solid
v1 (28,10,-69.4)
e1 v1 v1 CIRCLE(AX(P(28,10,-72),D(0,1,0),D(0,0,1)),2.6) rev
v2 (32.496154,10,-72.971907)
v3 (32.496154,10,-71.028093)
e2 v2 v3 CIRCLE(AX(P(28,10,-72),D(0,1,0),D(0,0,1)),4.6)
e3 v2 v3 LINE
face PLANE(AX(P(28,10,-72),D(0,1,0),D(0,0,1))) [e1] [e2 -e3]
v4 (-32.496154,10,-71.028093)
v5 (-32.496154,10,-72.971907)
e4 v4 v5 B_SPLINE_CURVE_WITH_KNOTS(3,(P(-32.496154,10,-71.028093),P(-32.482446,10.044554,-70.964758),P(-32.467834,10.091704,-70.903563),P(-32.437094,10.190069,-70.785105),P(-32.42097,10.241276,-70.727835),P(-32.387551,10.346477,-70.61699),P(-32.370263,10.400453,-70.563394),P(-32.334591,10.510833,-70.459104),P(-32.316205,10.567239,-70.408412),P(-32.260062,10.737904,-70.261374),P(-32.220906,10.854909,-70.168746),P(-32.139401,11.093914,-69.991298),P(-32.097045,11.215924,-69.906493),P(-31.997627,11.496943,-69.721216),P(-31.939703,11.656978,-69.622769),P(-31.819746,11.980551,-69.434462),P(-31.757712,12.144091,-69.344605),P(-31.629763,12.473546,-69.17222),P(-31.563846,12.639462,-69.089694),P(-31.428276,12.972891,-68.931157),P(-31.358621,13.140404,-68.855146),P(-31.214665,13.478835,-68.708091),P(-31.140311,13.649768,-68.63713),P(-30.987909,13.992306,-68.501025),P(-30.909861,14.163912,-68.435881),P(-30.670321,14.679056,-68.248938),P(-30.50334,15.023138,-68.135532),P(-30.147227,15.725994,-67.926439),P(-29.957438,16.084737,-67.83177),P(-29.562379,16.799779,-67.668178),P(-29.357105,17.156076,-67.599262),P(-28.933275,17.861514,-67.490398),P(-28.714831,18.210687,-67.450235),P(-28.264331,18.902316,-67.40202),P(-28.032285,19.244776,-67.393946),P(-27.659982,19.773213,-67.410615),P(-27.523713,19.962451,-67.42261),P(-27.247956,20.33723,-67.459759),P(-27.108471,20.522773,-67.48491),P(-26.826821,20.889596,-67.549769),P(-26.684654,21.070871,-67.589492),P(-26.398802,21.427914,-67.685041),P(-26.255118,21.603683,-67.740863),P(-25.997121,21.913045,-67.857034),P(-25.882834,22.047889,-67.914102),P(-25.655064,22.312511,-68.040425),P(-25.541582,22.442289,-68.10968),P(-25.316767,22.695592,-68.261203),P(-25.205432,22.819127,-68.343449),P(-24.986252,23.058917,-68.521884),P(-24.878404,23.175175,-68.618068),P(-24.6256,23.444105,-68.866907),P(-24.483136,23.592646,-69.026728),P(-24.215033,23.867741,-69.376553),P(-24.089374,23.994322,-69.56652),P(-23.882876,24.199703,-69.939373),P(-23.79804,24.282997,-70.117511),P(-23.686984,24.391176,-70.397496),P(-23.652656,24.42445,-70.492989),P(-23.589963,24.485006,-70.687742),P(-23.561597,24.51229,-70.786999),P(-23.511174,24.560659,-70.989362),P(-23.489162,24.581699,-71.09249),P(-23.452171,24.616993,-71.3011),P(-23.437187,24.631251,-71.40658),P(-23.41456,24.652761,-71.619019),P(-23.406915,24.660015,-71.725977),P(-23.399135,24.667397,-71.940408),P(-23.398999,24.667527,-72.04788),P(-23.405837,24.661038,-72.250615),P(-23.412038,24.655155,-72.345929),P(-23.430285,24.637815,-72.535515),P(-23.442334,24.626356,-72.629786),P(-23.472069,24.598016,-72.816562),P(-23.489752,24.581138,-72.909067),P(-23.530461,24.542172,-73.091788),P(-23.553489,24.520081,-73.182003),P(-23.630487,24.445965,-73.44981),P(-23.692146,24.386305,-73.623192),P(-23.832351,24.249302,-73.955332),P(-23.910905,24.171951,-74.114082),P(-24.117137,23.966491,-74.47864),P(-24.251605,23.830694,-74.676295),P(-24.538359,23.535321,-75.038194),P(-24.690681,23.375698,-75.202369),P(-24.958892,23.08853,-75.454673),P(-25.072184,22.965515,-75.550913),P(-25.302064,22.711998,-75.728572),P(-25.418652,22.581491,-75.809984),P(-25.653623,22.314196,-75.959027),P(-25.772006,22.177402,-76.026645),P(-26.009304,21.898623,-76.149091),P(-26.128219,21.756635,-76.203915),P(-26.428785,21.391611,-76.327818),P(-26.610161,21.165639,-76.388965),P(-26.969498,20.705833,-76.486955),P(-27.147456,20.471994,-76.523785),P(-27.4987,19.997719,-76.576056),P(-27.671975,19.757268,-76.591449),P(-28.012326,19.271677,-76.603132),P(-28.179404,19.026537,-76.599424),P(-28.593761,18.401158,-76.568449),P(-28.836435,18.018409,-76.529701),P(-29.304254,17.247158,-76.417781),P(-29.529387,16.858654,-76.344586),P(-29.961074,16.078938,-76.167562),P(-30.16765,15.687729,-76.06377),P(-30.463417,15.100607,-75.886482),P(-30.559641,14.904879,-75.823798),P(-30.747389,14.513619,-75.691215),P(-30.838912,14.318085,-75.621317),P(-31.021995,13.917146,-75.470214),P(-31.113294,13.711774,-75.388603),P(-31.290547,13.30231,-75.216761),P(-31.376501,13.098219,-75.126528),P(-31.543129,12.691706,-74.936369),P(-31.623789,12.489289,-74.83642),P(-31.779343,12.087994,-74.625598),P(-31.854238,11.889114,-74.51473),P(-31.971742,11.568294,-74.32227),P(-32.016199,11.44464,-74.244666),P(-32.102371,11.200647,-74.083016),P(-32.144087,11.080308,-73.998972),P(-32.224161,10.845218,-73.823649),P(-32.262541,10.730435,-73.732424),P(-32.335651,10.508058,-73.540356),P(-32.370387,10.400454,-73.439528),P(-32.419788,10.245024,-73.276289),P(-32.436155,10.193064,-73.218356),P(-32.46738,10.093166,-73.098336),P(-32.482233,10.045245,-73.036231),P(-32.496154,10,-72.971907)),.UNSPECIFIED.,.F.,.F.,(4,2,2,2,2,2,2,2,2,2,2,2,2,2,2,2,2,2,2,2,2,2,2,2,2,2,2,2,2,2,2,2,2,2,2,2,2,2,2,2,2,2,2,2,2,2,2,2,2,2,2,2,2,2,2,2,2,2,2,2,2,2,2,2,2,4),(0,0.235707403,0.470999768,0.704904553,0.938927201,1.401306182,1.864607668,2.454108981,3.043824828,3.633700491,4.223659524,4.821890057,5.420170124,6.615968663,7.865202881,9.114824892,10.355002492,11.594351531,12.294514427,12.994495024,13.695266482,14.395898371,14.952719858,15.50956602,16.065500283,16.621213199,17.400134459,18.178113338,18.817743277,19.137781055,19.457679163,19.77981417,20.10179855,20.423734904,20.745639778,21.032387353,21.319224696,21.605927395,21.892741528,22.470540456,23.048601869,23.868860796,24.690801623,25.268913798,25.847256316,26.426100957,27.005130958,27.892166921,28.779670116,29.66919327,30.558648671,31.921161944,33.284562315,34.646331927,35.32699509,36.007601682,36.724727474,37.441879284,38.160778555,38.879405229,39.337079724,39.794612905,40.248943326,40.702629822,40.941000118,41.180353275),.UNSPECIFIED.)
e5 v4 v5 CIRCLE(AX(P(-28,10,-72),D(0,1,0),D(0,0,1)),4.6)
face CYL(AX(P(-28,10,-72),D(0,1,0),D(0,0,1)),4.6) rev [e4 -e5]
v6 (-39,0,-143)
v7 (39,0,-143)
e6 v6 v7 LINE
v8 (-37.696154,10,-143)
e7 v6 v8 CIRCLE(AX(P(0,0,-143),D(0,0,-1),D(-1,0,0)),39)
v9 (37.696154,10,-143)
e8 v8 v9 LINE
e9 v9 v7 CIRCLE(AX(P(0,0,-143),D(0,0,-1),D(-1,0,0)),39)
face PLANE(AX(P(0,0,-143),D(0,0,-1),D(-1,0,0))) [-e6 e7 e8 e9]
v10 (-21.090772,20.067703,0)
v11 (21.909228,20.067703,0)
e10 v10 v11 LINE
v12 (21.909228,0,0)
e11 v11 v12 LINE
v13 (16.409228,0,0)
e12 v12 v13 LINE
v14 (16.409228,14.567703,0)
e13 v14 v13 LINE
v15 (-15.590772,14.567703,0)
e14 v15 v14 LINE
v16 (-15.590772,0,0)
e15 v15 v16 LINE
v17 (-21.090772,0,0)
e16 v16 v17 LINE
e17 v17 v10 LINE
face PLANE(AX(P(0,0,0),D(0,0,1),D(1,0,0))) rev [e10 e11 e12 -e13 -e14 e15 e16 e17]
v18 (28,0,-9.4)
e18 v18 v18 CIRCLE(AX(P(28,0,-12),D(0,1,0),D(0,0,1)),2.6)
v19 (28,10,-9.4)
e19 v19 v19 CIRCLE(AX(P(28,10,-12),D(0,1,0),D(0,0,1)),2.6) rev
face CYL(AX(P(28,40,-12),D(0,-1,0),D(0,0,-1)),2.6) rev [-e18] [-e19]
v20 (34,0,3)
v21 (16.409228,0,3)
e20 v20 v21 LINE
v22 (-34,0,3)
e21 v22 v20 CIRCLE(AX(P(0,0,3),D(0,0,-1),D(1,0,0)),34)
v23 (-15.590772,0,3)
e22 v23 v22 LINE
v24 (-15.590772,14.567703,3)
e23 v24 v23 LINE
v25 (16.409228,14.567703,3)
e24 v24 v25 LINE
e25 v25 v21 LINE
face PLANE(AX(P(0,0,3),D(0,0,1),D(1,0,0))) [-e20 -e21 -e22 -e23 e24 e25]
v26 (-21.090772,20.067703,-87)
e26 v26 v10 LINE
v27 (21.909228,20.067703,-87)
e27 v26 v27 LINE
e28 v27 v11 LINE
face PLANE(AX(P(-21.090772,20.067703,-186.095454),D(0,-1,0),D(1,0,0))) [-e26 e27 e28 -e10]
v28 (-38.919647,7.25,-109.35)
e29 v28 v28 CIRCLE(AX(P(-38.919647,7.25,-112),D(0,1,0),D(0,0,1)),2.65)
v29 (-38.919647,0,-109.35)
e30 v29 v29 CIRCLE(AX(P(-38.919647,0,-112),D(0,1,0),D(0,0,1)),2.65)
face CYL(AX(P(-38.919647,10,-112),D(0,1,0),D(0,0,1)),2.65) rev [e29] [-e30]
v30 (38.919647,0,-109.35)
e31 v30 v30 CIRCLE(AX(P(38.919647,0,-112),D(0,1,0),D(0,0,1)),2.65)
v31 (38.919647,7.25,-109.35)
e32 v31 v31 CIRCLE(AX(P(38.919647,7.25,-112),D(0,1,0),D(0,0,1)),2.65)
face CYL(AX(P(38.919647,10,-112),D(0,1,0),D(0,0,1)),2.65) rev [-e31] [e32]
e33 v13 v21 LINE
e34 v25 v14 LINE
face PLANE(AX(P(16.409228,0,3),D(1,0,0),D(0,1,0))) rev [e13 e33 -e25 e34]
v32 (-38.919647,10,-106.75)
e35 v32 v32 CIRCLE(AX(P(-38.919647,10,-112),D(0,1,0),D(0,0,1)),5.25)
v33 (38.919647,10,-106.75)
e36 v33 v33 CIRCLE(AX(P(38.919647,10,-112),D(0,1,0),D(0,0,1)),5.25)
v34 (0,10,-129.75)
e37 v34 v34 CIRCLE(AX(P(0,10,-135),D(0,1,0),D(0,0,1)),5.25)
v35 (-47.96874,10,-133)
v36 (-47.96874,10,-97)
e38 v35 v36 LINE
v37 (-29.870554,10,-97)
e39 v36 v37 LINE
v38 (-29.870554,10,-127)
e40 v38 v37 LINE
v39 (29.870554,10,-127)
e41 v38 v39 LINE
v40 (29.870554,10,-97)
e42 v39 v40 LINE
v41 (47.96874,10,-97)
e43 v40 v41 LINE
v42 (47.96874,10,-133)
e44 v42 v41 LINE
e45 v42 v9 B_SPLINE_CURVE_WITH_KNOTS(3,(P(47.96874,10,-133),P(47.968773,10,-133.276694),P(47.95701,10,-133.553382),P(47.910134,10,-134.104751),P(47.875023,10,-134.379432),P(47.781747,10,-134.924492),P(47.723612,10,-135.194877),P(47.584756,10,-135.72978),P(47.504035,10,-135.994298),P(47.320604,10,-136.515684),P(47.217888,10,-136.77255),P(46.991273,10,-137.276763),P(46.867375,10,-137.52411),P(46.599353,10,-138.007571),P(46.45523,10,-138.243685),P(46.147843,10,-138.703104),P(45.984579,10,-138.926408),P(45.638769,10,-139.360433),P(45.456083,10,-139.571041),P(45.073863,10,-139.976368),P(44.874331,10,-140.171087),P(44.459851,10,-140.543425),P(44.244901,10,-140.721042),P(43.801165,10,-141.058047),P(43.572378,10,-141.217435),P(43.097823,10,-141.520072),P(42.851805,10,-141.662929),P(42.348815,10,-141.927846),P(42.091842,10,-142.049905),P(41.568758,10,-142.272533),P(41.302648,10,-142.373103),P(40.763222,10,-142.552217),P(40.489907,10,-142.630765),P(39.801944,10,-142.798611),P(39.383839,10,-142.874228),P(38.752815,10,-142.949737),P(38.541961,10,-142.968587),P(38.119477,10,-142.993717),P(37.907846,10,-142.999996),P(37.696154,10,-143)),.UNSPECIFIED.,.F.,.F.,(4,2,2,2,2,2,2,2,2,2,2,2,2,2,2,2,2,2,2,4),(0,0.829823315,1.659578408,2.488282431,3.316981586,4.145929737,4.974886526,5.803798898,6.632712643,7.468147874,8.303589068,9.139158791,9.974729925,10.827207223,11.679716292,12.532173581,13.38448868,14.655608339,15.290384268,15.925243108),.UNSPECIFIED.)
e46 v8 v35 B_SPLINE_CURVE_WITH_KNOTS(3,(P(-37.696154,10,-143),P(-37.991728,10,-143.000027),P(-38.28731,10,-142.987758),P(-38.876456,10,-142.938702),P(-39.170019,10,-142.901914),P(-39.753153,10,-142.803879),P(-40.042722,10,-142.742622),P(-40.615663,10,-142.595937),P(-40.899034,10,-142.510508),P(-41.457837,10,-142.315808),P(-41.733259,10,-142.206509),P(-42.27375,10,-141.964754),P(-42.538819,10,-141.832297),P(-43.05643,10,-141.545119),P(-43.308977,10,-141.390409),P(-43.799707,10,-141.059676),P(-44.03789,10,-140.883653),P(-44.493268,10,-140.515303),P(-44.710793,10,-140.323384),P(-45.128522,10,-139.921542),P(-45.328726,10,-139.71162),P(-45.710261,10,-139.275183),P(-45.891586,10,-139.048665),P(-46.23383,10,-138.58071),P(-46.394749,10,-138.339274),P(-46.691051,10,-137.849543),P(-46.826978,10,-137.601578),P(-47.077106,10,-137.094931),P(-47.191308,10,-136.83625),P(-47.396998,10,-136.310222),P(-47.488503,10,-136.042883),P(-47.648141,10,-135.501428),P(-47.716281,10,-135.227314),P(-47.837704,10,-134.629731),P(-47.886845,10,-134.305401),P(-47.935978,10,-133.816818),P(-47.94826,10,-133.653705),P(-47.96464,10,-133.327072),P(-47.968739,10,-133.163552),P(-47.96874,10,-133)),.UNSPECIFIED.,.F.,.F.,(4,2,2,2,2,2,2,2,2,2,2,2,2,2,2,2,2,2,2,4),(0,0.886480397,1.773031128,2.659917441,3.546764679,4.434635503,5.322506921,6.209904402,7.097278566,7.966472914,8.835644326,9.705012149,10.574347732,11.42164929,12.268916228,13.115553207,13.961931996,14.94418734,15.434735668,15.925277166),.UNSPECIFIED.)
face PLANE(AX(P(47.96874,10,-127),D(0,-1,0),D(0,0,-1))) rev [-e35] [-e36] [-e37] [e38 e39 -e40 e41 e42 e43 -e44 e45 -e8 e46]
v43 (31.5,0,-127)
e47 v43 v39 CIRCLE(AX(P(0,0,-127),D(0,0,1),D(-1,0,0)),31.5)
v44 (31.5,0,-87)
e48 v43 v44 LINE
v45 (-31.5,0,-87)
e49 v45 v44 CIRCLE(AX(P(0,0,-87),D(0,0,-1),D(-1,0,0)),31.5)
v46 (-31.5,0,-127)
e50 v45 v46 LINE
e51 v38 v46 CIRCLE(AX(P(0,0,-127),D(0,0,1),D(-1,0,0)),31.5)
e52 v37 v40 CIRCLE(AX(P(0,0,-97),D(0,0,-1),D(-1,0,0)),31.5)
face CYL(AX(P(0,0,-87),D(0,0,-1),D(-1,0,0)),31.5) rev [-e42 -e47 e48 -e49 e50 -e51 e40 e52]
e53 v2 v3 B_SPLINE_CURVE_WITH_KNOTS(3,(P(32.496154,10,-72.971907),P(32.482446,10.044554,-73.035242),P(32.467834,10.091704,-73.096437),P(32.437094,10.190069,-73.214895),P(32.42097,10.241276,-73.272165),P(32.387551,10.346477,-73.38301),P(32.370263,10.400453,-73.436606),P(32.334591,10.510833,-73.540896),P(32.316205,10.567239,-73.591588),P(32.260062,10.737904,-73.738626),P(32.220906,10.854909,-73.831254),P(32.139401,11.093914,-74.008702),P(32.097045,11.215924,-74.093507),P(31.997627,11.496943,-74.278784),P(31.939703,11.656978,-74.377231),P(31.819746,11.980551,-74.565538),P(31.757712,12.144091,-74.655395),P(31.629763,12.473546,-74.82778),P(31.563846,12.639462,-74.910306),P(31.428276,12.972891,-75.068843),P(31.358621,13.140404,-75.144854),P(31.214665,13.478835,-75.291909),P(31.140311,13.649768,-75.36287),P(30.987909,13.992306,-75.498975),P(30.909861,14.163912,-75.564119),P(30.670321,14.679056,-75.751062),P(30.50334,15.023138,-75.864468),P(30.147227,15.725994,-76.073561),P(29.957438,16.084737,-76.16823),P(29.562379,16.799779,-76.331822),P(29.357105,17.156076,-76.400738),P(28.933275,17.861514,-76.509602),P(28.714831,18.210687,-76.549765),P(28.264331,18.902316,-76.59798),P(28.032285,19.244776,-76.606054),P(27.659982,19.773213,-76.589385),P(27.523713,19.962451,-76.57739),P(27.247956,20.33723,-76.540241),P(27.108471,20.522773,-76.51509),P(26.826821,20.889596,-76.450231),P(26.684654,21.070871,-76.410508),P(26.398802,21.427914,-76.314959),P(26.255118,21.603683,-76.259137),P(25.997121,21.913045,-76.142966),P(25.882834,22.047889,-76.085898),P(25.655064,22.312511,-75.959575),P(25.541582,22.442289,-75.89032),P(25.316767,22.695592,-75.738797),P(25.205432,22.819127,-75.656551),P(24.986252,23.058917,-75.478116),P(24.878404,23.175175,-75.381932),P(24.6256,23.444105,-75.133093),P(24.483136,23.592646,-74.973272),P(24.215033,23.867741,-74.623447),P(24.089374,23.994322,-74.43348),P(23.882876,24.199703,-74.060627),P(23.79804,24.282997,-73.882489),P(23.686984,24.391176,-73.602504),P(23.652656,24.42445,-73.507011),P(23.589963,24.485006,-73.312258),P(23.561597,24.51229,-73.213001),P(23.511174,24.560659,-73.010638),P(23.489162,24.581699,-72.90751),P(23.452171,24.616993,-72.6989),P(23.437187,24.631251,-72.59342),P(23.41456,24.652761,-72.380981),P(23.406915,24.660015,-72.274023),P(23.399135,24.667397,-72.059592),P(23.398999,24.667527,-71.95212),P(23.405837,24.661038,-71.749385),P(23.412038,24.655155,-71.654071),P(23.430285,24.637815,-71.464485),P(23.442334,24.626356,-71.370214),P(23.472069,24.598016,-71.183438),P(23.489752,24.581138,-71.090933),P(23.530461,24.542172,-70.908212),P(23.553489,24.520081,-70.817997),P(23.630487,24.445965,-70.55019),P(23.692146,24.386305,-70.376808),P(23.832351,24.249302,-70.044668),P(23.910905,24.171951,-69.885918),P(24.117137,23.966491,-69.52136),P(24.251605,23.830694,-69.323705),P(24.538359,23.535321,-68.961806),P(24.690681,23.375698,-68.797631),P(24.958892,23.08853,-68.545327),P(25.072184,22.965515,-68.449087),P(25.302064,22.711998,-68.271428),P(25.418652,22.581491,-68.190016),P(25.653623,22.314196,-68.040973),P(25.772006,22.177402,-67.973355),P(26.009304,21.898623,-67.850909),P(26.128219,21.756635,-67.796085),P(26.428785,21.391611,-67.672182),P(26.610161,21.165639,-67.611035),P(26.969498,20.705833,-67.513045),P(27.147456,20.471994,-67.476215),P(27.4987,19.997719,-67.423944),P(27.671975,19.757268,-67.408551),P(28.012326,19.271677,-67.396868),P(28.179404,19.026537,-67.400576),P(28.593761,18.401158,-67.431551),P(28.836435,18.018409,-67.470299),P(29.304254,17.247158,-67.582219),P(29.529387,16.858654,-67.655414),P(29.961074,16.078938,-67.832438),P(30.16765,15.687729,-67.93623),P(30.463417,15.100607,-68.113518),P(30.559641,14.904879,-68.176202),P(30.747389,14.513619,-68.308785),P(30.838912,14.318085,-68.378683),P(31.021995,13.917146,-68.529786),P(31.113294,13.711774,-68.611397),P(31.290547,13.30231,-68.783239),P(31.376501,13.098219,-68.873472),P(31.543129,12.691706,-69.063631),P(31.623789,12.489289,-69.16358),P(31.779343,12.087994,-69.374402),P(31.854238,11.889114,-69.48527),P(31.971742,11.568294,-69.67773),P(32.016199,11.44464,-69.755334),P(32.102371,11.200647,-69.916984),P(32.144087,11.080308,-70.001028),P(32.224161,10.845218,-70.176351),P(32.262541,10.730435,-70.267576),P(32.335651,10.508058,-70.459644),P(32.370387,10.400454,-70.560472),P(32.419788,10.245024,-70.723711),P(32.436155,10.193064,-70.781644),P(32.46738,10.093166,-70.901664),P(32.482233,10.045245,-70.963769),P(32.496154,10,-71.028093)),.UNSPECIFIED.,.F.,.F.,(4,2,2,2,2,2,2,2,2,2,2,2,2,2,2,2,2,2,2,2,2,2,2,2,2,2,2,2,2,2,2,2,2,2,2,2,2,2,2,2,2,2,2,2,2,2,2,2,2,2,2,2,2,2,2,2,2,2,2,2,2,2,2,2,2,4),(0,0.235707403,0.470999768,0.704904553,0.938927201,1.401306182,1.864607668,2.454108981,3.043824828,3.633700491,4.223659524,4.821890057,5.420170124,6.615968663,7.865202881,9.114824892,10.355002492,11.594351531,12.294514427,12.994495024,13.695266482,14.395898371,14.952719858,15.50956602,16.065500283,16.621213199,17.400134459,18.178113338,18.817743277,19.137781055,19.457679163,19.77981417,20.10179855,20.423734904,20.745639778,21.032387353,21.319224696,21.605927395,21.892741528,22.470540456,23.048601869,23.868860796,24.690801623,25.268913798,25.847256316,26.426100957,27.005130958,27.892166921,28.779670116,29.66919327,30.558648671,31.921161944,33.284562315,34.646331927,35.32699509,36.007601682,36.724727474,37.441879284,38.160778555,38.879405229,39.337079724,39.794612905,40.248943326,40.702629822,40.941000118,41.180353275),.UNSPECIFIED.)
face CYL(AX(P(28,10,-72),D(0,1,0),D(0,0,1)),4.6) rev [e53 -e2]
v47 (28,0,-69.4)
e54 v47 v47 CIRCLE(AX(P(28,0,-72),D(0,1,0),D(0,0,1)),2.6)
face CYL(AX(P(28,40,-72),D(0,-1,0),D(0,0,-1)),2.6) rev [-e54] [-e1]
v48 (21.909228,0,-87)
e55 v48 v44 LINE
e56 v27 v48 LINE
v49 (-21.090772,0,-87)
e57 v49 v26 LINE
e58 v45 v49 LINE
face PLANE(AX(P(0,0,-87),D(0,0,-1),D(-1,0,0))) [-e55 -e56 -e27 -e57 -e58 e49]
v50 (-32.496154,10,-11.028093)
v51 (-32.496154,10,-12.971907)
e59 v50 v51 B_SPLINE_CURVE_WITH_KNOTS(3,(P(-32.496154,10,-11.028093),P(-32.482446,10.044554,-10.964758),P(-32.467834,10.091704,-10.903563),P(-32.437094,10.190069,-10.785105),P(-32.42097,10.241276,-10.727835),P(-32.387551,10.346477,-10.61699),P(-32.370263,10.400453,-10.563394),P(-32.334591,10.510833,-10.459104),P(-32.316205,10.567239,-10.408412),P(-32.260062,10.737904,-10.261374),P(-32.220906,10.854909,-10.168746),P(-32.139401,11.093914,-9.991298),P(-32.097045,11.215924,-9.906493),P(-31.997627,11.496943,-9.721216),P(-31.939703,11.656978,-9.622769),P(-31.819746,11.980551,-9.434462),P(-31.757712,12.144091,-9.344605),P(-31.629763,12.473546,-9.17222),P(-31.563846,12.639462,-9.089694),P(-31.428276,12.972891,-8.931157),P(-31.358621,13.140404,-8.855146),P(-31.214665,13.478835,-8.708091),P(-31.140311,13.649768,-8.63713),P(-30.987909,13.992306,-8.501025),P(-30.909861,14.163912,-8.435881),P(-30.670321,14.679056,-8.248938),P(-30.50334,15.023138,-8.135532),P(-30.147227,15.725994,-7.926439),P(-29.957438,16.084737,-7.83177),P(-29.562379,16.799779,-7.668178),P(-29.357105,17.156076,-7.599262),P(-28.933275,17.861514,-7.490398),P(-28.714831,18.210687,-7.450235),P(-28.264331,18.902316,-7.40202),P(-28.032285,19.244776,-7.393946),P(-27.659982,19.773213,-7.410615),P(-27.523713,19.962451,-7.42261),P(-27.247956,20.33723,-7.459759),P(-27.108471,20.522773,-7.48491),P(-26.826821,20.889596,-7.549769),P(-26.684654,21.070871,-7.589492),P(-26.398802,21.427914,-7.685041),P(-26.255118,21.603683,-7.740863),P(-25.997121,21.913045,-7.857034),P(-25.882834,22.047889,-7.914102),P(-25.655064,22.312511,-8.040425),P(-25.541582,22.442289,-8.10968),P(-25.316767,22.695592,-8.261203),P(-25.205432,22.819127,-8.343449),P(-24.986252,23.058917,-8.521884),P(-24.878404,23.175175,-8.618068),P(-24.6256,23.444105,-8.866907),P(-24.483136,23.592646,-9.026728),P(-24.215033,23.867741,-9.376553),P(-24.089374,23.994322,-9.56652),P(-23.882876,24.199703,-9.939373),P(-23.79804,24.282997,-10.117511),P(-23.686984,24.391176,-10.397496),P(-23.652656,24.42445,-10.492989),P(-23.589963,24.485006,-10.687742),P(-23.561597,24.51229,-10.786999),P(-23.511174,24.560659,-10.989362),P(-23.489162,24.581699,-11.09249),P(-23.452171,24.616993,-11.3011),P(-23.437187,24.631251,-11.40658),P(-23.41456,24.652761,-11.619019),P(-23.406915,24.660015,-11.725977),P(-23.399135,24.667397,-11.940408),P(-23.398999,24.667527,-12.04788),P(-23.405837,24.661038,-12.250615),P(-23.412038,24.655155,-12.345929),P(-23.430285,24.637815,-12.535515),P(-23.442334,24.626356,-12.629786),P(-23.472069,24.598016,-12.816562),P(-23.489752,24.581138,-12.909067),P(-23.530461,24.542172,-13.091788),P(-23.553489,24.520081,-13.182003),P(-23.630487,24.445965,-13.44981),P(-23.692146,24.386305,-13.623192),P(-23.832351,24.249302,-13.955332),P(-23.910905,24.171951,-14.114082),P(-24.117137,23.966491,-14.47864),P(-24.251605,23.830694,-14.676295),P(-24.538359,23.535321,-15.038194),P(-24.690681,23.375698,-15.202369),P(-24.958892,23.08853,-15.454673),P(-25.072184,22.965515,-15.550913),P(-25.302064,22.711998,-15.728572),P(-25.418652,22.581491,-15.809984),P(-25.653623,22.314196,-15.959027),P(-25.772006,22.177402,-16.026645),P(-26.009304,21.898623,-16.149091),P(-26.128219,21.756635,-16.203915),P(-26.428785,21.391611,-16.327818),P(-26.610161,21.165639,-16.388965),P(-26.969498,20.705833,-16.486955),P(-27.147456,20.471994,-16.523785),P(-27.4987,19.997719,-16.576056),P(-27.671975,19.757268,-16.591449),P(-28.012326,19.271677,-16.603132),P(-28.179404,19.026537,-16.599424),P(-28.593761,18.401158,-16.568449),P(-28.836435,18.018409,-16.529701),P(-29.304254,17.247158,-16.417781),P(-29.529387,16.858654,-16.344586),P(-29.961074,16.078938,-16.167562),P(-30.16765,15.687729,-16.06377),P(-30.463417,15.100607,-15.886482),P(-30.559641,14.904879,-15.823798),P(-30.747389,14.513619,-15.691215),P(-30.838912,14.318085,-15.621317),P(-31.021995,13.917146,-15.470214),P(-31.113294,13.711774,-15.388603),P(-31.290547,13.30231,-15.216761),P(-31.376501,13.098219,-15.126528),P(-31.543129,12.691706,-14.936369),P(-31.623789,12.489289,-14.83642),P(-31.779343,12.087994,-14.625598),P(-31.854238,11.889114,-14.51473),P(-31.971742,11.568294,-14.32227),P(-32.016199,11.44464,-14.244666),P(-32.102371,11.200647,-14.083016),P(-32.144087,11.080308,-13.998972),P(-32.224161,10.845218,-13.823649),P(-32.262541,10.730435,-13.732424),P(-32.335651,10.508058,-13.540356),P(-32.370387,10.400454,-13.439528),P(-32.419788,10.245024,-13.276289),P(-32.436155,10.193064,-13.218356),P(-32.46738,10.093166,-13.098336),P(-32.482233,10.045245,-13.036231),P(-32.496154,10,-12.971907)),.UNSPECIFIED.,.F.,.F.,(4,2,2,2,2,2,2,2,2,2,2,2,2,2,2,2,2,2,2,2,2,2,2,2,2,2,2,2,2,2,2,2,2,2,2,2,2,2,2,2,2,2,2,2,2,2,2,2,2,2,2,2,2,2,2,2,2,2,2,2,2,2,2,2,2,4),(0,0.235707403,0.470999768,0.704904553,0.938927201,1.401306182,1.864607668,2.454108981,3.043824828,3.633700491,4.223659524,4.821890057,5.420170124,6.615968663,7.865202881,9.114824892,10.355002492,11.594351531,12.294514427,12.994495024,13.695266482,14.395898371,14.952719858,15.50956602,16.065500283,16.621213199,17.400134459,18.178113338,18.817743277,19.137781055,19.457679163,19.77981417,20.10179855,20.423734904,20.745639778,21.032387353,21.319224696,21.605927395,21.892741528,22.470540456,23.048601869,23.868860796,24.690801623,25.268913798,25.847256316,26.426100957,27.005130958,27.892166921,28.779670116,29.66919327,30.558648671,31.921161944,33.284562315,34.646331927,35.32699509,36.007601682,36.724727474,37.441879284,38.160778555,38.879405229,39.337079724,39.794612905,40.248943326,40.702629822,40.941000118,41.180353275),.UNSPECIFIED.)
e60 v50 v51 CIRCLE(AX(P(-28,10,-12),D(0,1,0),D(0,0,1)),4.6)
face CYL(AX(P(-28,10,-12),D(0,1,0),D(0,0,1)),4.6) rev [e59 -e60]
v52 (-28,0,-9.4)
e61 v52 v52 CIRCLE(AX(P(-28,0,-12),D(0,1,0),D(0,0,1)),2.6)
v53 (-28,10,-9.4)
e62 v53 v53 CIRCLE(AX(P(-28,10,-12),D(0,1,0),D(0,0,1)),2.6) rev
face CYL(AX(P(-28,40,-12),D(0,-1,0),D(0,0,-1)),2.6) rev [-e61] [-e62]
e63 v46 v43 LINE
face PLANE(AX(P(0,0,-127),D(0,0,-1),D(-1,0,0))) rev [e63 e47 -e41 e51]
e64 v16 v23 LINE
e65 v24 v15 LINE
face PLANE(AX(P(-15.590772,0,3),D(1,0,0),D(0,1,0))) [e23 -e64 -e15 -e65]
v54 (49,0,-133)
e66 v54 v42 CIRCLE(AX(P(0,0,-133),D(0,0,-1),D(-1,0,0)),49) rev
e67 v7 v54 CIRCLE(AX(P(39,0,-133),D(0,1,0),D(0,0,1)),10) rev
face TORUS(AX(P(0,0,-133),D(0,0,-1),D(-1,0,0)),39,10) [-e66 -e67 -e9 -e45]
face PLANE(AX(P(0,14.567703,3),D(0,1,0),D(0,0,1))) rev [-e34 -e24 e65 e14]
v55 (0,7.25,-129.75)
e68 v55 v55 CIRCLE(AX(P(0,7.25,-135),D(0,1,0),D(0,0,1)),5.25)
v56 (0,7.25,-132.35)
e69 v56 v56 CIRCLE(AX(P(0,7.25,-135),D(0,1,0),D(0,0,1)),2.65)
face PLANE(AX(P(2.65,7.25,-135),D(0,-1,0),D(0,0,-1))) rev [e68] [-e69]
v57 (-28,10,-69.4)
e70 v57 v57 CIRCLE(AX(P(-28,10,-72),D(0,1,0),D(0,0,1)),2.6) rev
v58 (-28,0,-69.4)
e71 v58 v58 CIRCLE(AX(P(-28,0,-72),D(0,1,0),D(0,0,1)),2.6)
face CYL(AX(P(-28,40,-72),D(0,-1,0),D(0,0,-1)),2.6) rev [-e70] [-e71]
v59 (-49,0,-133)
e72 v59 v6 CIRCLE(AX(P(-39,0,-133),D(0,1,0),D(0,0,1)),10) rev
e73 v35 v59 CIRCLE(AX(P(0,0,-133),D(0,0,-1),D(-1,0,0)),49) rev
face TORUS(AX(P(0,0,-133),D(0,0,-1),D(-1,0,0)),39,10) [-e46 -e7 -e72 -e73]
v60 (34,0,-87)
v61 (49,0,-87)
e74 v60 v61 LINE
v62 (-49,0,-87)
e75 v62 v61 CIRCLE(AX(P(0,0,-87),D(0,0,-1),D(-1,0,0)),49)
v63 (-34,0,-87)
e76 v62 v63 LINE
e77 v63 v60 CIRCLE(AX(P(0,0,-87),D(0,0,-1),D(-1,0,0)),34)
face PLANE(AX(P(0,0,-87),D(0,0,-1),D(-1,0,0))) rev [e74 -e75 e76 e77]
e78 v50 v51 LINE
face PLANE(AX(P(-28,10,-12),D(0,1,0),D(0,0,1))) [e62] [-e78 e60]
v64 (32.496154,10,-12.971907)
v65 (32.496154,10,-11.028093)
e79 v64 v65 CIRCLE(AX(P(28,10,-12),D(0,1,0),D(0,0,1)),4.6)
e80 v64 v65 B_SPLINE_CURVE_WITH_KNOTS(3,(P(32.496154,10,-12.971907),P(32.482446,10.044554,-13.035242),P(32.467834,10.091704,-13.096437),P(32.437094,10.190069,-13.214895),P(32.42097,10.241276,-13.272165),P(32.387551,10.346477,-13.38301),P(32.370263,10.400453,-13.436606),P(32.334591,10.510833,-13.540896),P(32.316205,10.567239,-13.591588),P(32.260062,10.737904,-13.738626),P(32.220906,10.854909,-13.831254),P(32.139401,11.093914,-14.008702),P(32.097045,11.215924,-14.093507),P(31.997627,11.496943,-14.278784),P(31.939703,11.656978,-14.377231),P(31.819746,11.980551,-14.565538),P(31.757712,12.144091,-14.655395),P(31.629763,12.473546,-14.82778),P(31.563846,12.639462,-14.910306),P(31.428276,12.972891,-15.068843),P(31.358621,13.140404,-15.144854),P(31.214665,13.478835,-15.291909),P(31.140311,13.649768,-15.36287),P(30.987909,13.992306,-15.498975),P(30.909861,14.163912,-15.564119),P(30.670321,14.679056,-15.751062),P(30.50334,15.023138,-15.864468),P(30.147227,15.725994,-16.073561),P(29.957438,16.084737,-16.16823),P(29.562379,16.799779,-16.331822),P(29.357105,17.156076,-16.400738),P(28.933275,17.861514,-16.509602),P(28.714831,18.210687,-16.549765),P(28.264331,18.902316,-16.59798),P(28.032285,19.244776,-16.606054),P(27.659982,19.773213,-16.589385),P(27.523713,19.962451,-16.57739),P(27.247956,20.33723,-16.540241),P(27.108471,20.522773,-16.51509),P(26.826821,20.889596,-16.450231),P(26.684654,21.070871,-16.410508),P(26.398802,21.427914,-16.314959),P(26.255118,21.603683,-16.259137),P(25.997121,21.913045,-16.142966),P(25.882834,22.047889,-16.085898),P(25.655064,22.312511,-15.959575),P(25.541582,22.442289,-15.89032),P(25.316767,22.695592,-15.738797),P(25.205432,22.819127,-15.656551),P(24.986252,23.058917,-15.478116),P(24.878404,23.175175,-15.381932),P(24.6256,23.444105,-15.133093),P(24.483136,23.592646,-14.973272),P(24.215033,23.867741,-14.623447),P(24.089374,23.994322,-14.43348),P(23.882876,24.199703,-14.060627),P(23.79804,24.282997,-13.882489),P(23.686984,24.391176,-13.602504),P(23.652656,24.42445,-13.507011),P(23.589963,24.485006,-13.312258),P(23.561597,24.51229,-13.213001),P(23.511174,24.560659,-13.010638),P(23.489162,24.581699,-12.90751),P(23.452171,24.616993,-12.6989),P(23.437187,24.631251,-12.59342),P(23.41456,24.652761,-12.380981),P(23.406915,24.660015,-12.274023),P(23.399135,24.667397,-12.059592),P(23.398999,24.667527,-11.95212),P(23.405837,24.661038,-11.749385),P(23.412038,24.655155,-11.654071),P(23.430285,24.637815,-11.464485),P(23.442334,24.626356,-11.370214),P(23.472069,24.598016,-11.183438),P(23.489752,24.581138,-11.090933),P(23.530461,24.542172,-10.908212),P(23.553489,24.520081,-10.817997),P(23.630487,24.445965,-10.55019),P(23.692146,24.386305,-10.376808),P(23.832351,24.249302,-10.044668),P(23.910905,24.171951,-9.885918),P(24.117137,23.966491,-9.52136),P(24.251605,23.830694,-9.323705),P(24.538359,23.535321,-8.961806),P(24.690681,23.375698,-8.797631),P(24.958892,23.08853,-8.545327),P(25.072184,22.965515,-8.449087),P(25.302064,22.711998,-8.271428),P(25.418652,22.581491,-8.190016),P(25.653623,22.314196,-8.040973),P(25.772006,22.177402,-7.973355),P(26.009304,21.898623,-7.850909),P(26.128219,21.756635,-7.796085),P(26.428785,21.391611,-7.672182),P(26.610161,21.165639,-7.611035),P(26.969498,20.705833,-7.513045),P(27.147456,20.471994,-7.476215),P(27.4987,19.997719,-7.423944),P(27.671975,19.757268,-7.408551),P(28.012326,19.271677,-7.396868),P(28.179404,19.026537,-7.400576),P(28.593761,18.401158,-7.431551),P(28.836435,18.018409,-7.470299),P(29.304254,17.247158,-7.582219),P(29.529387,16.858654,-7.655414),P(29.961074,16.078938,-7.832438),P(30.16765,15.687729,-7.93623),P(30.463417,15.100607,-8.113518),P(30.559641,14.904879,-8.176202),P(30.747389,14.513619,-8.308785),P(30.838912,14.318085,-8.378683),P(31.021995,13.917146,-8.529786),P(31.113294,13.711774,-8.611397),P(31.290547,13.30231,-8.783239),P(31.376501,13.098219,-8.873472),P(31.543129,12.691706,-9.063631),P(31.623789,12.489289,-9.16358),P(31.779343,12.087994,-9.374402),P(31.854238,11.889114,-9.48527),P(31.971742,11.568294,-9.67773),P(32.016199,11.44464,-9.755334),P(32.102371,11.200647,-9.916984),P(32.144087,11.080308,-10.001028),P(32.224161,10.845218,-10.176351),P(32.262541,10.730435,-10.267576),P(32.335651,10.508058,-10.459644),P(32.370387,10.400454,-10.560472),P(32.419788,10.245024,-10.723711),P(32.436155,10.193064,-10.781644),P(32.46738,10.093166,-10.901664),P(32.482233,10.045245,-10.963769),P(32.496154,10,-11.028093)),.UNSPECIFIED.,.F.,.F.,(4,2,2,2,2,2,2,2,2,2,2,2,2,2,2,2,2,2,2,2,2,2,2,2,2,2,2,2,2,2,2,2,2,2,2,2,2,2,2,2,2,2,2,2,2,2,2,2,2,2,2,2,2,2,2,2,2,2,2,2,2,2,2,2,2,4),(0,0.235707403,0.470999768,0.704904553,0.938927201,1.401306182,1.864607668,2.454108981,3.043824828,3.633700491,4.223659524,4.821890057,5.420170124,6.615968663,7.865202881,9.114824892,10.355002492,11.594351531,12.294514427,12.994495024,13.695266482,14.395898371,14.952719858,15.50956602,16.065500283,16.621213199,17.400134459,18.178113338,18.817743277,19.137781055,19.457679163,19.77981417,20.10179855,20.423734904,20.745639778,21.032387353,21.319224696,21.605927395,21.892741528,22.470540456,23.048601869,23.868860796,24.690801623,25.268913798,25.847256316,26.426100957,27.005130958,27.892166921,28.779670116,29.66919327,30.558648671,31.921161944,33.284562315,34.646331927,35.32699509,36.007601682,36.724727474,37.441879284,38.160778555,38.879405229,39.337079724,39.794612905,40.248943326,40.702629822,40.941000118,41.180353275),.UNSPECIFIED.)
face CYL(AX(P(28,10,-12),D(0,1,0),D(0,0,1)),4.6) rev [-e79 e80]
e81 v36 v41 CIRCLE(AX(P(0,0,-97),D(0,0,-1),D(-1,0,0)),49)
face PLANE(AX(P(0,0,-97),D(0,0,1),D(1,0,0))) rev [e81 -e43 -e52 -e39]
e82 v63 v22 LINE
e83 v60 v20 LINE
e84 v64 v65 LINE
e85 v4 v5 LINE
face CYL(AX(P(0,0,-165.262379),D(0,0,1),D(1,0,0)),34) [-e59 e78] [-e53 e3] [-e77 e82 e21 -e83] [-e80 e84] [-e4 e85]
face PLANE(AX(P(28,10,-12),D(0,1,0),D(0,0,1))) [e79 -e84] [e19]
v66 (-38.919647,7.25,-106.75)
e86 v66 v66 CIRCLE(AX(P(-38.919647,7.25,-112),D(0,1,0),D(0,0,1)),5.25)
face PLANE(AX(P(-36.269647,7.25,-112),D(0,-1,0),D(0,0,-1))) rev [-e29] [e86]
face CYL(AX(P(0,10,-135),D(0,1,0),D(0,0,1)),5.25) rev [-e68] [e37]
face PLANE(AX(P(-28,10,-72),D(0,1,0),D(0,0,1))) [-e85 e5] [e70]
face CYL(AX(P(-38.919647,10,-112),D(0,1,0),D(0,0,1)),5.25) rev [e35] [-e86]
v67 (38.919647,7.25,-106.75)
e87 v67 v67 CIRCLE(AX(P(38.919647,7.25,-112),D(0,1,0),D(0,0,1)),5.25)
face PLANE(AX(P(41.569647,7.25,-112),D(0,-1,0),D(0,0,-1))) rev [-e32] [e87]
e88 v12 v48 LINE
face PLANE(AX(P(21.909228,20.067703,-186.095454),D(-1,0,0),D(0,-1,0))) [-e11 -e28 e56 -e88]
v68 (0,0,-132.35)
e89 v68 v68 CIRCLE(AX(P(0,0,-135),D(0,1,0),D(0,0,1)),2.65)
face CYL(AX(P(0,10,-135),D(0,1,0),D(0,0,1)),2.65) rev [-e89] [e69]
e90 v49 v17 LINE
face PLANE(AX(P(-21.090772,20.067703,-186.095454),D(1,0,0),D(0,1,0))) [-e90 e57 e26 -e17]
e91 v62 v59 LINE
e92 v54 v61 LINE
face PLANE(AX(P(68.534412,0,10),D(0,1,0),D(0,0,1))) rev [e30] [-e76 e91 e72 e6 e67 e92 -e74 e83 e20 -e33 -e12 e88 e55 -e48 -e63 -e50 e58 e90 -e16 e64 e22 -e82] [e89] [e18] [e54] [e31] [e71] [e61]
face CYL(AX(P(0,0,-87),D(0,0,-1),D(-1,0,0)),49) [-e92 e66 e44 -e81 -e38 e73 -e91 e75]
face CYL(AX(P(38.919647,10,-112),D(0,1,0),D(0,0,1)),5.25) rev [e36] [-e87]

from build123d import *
from build123d.topology import SkipClean

# Parameters (mm, degrees)
ESQUISSE2_R                                      = 31.5
ESQUISSE2_W                                      = 32
ESQUISSE2_H                                      = 32
BOSS_EXTRU_1_DEPTH                               = 3
BOSS_EXTRU_2_START                               = -100
ESQUISSE4_R                                      = 35
ESQUISSE4_R_2                                    = 31.5
BOSS_EXTRU_2_DEPTH                               = 100
BOSS_EXTRU_3_OUTLINE_R                           = 31.5
BOSS_EXTRU_3_OUTLINE_W                           = 43
BOSS_EXTRU_3_OUTLINE_H                           = 42.5
BOSS_EXTRU_3_DEPTH                               = 97
ESQUISSE6_R                                      = 31.5
ENL_V_MAT_EXTRU_1_DEPTH                          = 10
ESQUISSE7_R                                      = 49
ESQUISSE7_R_2                                    = 35
BOSS_EXTRU_4_DEPTH                               = 10
BOSS_EXTRU_5_START                               = 30
BOSS_EXTRU_5_DEPTH                               = 30
BOSS_EXTRU_6_START                               = 16
BOSS_EXTRU_6_DEPTH                               = 16
CONG_1_R                                         = 10
ESQUISSE11_W                                     = 137.068824
ESQUISSE11_H                                     = 50.889867
ENL_V_MAT_EXTRU_2_DEPTH                          = 153
CHAMBRAGE_POUR_VIS_T_TE_RONDE_6_PANS_D           = 5.3
CHAMBRAGE_POUR_VIS_T_TE_RONDE_6_PANS_DEPTH       = 18
CHAMBRAGE_POUR_VIS_T_TE_RONDE_6_PANS_CBORE_D     = 10.5
CHAMBRAGE_POUR_VIS_T_TE_RONDE_6_PANS_CBORE_DEPTH = 2.75
CHAMBRAGE_POUR_VIS_T_TE_RONDE_6_PANS_TIP         = 1.592281
ESQUISSE18_R                                     = 2.6
ENL_V_MAT_EXTRU_4_DEPTH                          = 25
ESQUISSE19_R                                     = 4.6
ENL_V_MAT_EXTRU_5_DEPTH                          = 25
ENL_V_START                                      = -90
ENL_V_MAT_EXTRU_6_DEPTH                          = 90


# Read off the part's stored shape, not the designer's step: Boss.-Extru.3
with BuildPart() as part:
    # Esquisse2 → Boss.-Extru.1 (new body)
    with BuildSketch(Plane.XY):
        Circle(ESQUISSE2_R)
        with Locations((0.409228, -1.432297)):
            Rectangle(ESQUISSE2_W, ESQUISSE2_H, mode=Mode.SUBTRACT)
    extrude(amount=BOSS_EXTRU_1_DEPTH)

    # Esquisse4 → Boss.-Extru.2 (add)
    with BuildSketch(Plane.XY.offset(3).offset(BOSS_EXTRU_2_START)):
        Circle(ESQUISSE4_R)
        Circle(ESQUISSE4_R_2, mode=Mode.SUBTRACT)
    extrude(amount=BOSS_EXTRU_2_DEPTH)

    # Boss.-Extru.3 outline → Boss.-Extru.3 (add)
    with BuildSketch(Plane(origin=(0, 0, 0), x_dir=(-1, 0, 0), z_dir=(0, 0, -1))):
        Circle(BOSS_EXTRU_3_OUTLINE_R)
        with Locations((-0.409228, -1.182297)):
            Rectangle(BOSS_EXTRU_3_OUTLINE_W, BOSS_EXTRU_3_OUTLINE_H, mode=Mode.SUBTRACT)
    extrude(amount=BOSS_EXTRU_3_DEPTH)

    # Esquisse6 → Enlèv. mat.-Extru.1 (cut)
    with BuildSketch(Plane(origin=(0, 0, -97), x_dir=(-1, 0, 0), z_dir=(0, 0, -1))):
        Circle(ESQUISSE6_R)
    extrude(amount=-ENL_V_MAT_EXTRU_1_DEPTH, mode=Mode.SUBTRACT)

    # Esquisse7 → Boss.-Extru.4 (add)
    with BuildSketch(Plane(origin=(0, 0, -97), x_dir=(-1, 0, 0), z_dir=(0, 0, -1))):
        Circle(ESQUISSE7_R)
        with Locations(Location((0, 0, 0), (0, 0, 180))):
            Circle(ESQUISSE7_R_2, mode=Mode.SUBTRACT)
    extrude(amount=-BOSS_EXTRU_4_DEPTH)

    # Esquisse8 → Boss.-Extru.5 (add)
    with SkipClean():  # the faces are left unmerged after this step: merging them gives an invalid solid
        with BuildSketch(Plane(origin=(0, 0, -97), x_dir=(-1, 0, 0), z_dir=(0, 0, -1)).offset(BOSS_EXTRU_5_START)):
            with BuildLine():
                Line((-47.96874, 10), (-29.870554, 10))
                ThreePointArc((-29.870554, 10), (-31.5, 0), (-29.870554, -10))
                Line((-29.870554, -10), (-47.96874, -10))
                ThreePointArc((-47.96874, -10), (-49, 0), (-47.96874, 10))
            make_face()
            with BuildLine():
                Line((29.870554, 10), (47.96874, 10))
                ThreePointArc((47.96874, 10), (49, 0), (47.96874, -10))
                Line((47.96874, -10), (29.870554, -10))
                ThreePointArc((29.870554, -10), (31.5, 0), (29.870554, 10))
            make_face()
        extrude(amount=-BOSS_EXTRU_5_DEPTH)

    # Esquisse10 → Boss.-Extru.6 (add)
    with SkipClean():  # the faces are left unmerged after this step: merging them gives an invalid solid
        with BuildSketch(Plane(origin=(0, 0, -127), x_dir=(-1, 0, 0), z_dir=(0, 0, -1)).offset(BOSS_EXTRU_6_START)):
            with BuildLine():
                Line((47.96874, 10), (-47.96874, 10))
                ThreePointArc((-47.96874, 10), (-49, 0), (-47.96874, -10))
                Line((-47.96874, -10), (47.96874, -10))
                ThreePointArc((47.96874, -10), (49, 0), (47.96874, 10))
            make_face()
        extrude(amount=-BOSS_EXTRU_6_DEPTH)

    # Congé1
    cong_1_edges = [part.edges().sort_by_distance(p)[0] for p in [
        (-49, 0, -143),
        (49, 0, -143),
    ]]
    fillet(cong_1_edges, radius=CONG_1_R)

    # Esquisse11 → Enlèv. mat.-Extru.2 (cut)
    with SkipClean():  # the faces are left unmerged after this step: merging them gives an invalid solid
        with BuildSketch(Plane(origin=(0, 0, -143), x_dir=(-1, 0, 0), z_dir=(0, 0, -1))):
            with Locations((0, -25.444933)):
                Rectangle(ESQUISSE11_W, ESQUISSE11_H)
        extrude(amount=-ENL_V_MAT_EXTRU_2_DEPTH, mode=Mode.SUBTRACT)

    # Chambrage pour Vis à tête ronde à 6 pans creux M51
    with Locations(Plane(origin=(0, 10, 0), x_dir=(1, 0, 0), z_dir=(0, 1, 0))):
        with Locations((-38.919647, 112), (38.919647, 112), (0, 135)):
            CounterBoreHole(CHAMBRAGE_POUR_VIS_T_TE_RONDE_6_PANS_D / 2, CHAMBRAGE_POUR_VIS_T_TE_RONDE_6_PANS_CBORE_D / 2, CHAMBRAGE_POUR_VIS_T_TE_RONDE_6_PANS_CBORE_DEPTH, depth=CHAMBRAGE_POUR_VIS_T_TE_RONDE_6_PANS_DEPTH)
            with Locations((0, 0, -(CHAMBRAGE_POUR_VIS_T_TE_RONDE_6_PANS_DEPTH + CHAMBRAGE_POUR_VIS_T_TE_RONDE_6_PANS_TIP / 2))):  # 118° drill point
                Cone(0, CHAMBRAGE_POUR_VIS_T_TE_RONDE_6_PANS_D / 2, CHAMBRAGE_POUR_VIS_T_TE_RONDE_6_PANS_TIP, mode=Mode.SUBTRACT)

    # Esquisse18 → Enlèv. mat.-Extru.4 (cut, symmetric)
    with SkipClean():  # the faces are left unmerged after this step: merging them gives an invalid solid
        with BuildSketch(Plane(origin=(0, 15, 0), x_dir=(-1, 0, 0), z_dir=(0, -1, 0))):
            with Locations(Location((28, 12, 0), (0, 0, 90))):
                Circle(ESQUISSE18_R)
            with Locations(Location((-28, 12, 0), (0, 0, 90))):
                Circle(ESQUISSE18_R)
            with Locations(Location((28, 72, 0), (0, 0, 90))):
                Circle(ESQUISSE18_R)
            with Locations(Location((-28, 72, 0), (0, 0, 90))):
                Circle(ESQUISSE18_R)
        extrude(amount=ENL_V_MAT_EXTRU_4_DEPTH, both=True, mode=Mode.SUBTRACT)

    # Esquisse19 → Enlèv. mat.-Extru.5 (cut)
    with SkipClean():  # the faces are left unmerged after this step: merging them gives an invalid solid
        with BuildSketch(Plane.ZX.offset(35)):
            with Locations((-72, 28)):
                Circle(ESQUISSE19_R)
            with Locations((-12, 28)):
                Circle(ESQUISSE19_R)
            with Locations((-12, -28)):
                Circle(ESQUISSE19_R)
            with Locations((-72, -28)):
                Circle(ESQUISSE19_R)
        extrude(amount=-ENL_V_MAT_EXTRU_5_DEPTH, mode=Mode.SUBTRACT)

    # Esquisse20 → Enlèv. mat.-Extru.6 (cut)
    with SkipClean():  # the faces are left unmerged after this step: merging them gives an invalid solid
        with BuildSketch(Plane.XY.offset(3).offset(ENL_V_START)):
            with BuildLine():
                Line((-35, 0), (-34, 0))
                ThreePointArc((-34, 0), (0, 34), (34, 0))
                Line((34, 0), (35, 0))
                ThreePointArc((35, 0), (0, 35), (-35, 0))
            make_face()
        extrude(amount=ENL_V_MAT_EXTRU_6_DEPTH, mode=Mode.SUBTRACT)


solid = part.part
